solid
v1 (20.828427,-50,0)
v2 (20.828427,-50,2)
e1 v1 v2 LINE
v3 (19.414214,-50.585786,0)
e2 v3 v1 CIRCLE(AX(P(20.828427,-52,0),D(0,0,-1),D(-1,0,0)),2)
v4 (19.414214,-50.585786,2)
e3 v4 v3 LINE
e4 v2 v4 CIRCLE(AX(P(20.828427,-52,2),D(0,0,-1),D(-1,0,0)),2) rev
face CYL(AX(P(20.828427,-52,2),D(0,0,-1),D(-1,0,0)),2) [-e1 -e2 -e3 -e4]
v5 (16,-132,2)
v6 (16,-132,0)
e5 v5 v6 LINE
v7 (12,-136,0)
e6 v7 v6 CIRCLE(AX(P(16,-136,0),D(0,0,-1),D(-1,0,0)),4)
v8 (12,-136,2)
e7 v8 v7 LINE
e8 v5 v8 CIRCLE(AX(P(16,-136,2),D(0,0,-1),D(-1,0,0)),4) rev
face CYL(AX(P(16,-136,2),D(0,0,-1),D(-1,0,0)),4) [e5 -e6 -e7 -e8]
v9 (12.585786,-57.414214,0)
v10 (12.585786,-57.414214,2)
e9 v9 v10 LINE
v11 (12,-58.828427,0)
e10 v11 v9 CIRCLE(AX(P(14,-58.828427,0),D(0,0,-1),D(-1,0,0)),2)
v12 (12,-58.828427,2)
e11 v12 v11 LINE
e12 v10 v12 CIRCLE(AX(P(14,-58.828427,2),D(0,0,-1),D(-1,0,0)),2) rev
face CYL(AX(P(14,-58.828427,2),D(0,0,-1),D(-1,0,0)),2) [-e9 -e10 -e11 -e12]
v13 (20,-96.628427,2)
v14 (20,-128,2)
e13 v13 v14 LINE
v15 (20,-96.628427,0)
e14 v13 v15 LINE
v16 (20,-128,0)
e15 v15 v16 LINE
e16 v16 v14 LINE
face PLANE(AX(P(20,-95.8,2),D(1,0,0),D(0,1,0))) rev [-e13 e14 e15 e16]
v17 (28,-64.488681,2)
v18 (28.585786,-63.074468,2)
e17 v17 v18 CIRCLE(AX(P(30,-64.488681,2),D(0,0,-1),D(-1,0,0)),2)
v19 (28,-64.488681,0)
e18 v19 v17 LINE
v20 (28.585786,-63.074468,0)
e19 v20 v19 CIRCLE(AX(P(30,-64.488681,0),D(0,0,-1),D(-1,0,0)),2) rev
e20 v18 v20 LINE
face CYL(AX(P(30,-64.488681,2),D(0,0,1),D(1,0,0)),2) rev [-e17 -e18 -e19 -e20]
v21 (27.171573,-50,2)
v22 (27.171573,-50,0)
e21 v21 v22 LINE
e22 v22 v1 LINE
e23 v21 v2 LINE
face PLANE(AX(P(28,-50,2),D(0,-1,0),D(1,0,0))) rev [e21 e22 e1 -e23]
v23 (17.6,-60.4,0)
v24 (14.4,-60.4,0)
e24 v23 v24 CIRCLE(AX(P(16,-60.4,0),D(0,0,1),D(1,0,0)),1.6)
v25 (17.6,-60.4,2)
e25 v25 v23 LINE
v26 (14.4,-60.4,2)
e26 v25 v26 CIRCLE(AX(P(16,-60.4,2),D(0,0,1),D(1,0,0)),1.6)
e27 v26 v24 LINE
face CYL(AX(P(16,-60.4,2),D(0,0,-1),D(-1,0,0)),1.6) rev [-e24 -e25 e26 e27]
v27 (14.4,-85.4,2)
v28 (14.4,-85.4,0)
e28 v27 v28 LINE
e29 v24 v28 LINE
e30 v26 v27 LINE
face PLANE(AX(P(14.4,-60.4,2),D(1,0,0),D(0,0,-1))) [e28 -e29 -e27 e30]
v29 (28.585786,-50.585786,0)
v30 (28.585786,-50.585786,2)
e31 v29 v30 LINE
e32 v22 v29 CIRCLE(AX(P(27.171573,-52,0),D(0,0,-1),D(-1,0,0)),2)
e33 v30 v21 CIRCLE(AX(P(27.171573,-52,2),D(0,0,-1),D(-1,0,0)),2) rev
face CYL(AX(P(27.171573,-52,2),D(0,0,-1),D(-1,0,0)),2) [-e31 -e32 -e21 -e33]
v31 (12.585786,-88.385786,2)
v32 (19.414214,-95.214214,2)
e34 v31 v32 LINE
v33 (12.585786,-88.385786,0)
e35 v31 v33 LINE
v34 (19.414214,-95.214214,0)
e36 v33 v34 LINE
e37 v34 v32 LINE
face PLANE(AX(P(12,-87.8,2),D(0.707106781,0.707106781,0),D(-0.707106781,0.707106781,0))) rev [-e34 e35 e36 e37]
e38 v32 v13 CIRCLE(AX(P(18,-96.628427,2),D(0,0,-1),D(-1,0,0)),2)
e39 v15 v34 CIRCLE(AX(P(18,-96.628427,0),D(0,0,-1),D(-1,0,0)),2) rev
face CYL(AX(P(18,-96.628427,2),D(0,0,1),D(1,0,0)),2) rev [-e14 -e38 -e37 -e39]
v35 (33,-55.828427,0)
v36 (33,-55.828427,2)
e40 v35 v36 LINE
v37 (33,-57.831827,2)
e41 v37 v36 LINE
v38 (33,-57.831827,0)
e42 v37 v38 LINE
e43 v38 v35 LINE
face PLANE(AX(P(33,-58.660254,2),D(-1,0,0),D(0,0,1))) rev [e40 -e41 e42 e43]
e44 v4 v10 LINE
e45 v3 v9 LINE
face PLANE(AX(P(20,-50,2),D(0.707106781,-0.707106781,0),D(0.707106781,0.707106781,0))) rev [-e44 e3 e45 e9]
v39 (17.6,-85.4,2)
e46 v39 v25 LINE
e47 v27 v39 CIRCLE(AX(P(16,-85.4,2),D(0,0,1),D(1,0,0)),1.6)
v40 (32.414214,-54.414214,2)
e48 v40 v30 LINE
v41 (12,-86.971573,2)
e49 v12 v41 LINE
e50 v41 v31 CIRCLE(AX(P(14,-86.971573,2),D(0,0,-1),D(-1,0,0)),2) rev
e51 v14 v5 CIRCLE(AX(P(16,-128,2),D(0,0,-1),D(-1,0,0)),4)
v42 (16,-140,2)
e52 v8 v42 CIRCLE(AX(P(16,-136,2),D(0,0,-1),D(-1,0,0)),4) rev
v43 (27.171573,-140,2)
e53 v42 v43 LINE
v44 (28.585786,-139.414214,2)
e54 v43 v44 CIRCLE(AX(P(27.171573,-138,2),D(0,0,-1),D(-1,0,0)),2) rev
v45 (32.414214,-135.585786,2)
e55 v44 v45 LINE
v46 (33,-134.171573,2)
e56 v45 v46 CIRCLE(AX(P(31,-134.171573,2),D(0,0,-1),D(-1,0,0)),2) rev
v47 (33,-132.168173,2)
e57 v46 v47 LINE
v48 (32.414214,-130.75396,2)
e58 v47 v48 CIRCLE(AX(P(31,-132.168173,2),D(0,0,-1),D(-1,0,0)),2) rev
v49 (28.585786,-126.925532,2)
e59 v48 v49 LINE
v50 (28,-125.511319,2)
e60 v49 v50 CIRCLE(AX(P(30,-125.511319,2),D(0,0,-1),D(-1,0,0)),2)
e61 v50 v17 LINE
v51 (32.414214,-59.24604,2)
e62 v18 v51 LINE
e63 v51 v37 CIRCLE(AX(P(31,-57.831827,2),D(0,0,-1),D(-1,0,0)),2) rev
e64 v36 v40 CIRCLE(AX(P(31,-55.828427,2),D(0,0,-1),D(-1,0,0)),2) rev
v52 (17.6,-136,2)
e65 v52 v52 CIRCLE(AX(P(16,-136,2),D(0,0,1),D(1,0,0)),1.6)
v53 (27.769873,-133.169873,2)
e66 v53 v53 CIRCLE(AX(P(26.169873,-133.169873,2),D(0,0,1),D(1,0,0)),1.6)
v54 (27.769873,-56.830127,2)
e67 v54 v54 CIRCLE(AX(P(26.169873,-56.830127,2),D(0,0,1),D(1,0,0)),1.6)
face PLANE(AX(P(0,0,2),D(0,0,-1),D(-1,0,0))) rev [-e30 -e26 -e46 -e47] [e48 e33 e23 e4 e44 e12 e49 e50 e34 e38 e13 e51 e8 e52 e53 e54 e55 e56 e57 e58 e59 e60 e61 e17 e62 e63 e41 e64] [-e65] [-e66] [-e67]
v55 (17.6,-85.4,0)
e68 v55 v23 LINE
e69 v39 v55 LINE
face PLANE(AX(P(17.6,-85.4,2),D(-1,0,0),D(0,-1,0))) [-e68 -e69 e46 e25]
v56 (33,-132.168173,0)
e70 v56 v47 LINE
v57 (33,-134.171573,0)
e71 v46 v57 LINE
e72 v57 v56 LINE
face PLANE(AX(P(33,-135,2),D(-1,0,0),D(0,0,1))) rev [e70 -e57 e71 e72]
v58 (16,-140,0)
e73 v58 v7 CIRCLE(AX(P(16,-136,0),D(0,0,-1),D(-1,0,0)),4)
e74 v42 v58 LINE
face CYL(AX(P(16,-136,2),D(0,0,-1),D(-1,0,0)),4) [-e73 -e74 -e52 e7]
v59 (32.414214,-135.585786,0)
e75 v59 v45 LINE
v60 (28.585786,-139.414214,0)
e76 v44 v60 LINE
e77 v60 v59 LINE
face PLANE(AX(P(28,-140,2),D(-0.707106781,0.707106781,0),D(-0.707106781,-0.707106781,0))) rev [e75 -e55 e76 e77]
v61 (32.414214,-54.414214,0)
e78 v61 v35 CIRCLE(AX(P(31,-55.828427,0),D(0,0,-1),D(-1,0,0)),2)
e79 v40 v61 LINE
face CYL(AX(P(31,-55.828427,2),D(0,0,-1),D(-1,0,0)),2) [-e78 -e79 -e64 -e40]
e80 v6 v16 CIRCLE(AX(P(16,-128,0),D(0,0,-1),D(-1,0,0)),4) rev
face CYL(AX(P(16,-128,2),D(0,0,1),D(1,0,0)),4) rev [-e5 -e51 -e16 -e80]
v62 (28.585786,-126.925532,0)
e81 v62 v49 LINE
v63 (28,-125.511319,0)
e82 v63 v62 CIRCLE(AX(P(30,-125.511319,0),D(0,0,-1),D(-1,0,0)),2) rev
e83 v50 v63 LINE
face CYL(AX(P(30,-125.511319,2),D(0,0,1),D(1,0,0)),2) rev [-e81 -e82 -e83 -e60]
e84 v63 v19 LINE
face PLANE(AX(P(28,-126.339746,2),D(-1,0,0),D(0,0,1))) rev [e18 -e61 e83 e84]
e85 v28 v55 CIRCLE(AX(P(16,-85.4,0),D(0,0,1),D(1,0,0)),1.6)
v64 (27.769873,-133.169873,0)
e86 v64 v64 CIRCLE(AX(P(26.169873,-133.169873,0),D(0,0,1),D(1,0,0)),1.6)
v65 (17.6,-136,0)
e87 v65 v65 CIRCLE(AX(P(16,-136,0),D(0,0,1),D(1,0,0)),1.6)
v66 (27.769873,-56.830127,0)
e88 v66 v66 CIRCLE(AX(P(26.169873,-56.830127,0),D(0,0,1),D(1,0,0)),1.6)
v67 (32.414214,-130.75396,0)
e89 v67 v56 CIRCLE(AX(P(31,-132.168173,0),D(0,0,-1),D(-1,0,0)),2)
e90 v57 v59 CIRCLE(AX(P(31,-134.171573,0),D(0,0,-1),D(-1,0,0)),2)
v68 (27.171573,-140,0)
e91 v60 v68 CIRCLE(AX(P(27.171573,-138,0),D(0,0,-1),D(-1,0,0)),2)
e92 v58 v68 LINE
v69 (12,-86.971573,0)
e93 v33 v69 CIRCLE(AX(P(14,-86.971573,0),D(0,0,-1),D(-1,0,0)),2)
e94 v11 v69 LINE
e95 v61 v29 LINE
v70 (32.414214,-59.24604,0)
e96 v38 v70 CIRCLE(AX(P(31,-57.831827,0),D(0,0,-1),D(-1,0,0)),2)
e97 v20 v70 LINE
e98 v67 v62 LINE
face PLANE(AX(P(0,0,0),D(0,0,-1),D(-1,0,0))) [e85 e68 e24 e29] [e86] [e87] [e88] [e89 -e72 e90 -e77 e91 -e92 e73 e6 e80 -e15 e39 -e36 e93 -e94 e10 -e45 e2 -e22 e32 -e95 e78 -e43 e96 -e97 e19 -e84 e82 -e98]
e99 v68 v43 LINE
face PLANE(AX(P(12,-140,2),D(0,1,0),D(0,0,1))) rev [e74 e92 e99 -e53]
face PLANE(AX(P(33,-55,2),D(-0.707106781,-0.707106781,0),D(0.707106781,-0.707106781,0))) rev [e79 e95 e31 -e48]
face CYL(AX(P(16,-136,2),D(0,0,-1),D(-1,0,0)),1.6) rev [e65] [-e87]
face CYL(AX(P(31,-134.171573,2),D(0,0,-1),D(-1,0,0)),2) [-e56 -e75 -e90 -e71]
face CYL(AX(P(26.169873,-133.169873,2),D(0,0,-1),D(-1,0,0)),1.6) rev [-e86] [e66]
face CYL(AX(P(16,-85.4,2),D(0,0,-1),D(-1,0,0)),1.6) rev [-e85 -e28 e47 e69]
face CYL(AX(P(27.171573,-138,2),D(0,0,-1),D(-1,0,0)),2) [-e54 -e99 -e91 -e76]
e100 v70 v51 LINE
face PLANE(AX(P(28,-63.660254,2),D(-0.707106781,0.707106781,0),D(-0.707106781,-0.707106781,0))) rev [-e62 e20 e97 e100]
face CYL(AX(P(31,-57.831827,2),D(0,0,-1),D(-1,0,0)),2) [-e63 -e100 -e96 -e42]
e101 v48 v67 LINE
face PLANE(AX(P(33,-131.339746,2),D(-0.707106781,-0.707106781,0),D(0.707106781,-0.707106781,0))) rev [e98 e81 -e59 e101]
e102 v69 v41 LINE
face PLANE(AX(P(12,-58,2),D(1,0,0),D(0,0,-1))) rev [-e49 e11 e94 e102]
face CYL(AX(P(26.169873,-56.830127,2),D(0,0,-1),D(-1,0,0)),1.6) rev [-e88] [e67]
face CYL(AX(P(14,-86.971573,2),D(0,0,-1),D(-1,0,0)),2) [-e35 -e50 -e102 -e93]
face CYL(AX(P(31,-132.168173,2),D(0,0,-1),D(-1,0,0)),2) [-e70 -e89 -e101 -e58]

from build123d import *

# Parameters (mm, degrees)
SKETCH1_R           = 1.6
BOSS_EXTRUDE1_DEPTH = 2
FILLET1_R           = 4
FILLET2_R           = 2


with BuildPart() as part:
    # Sketch1 → Boss-Extrude1 (new body)
    with BuildSketch(Plane.XY):
        Polygon((28, -126.339745962), (28, -63.660254038), (33, -58.660254038), (33, -55), (28, -50), (20, -50), (12, -58), (12, -87.8), (20, -95.8), (20, -132), (12, -132), (12, -140), (28, -140), (33, -135), (33, -131.339745962), align=None)
        with Locations((26.169872981, -133.169872981)):
            Circle(SKETCH1_R, mode=Mode.SUBTRACT)
        with Locations((26.169872981, -56.830127019)):
            Circle(SKETCH1_R, mode=Mode.SUBTRACT)
        with Locations((16, -136)):
            Circle(SKETCH1_R, mode=Mode.SUBTRACT)
        with BuildLine():
            Line((17.6, -85.4), (17.6, -60.4))
            ThreePointArc((17.6, -60.4), (16, -58.8), (14.4, -60.4))
            Line((14.4, -60.4), (14.4, -85.4))
            ThreePointArc((14.4, -85.4), (16, -87), (17.6, -85.4))
        make_face(mode=Mode.SUBTRACT)
    extrude(amount=BOSS_EXTRUDE1_DEPTH)

    # Fillet1
    fillet1_edges = [part.edges().sort_by_distance(p)[0] for p in [
        (12, -140, 1),
        (20, -132, 1),
        (12, -132, 1),
    ]]
    fillet(fillet1_edges, radius=FILLET1_R - 0.0001)  # a hair under: the kernel refuses the full size

    # Fillet2
    fillet2_edges = [part.edges().sort_by_distance(p)[0] for p in [
        (33, -131.339745962, 1),
        (33, -135, 1),
        (28, -140, 1),
        (20, -95.8, 1),
        (12, -87.8, 1),
        (12, -58, 1),
        (20, -50, 1),
        (28, -50, 1),
        (33, -55, 1),
        (33, -58.660254038, 1),
        (28, -63.660254038, 1),
        (28, -126.339745962, 1),
    ]]
    fillet(fillet2_edges, radius=FILLET2_R)


solid = part.part
